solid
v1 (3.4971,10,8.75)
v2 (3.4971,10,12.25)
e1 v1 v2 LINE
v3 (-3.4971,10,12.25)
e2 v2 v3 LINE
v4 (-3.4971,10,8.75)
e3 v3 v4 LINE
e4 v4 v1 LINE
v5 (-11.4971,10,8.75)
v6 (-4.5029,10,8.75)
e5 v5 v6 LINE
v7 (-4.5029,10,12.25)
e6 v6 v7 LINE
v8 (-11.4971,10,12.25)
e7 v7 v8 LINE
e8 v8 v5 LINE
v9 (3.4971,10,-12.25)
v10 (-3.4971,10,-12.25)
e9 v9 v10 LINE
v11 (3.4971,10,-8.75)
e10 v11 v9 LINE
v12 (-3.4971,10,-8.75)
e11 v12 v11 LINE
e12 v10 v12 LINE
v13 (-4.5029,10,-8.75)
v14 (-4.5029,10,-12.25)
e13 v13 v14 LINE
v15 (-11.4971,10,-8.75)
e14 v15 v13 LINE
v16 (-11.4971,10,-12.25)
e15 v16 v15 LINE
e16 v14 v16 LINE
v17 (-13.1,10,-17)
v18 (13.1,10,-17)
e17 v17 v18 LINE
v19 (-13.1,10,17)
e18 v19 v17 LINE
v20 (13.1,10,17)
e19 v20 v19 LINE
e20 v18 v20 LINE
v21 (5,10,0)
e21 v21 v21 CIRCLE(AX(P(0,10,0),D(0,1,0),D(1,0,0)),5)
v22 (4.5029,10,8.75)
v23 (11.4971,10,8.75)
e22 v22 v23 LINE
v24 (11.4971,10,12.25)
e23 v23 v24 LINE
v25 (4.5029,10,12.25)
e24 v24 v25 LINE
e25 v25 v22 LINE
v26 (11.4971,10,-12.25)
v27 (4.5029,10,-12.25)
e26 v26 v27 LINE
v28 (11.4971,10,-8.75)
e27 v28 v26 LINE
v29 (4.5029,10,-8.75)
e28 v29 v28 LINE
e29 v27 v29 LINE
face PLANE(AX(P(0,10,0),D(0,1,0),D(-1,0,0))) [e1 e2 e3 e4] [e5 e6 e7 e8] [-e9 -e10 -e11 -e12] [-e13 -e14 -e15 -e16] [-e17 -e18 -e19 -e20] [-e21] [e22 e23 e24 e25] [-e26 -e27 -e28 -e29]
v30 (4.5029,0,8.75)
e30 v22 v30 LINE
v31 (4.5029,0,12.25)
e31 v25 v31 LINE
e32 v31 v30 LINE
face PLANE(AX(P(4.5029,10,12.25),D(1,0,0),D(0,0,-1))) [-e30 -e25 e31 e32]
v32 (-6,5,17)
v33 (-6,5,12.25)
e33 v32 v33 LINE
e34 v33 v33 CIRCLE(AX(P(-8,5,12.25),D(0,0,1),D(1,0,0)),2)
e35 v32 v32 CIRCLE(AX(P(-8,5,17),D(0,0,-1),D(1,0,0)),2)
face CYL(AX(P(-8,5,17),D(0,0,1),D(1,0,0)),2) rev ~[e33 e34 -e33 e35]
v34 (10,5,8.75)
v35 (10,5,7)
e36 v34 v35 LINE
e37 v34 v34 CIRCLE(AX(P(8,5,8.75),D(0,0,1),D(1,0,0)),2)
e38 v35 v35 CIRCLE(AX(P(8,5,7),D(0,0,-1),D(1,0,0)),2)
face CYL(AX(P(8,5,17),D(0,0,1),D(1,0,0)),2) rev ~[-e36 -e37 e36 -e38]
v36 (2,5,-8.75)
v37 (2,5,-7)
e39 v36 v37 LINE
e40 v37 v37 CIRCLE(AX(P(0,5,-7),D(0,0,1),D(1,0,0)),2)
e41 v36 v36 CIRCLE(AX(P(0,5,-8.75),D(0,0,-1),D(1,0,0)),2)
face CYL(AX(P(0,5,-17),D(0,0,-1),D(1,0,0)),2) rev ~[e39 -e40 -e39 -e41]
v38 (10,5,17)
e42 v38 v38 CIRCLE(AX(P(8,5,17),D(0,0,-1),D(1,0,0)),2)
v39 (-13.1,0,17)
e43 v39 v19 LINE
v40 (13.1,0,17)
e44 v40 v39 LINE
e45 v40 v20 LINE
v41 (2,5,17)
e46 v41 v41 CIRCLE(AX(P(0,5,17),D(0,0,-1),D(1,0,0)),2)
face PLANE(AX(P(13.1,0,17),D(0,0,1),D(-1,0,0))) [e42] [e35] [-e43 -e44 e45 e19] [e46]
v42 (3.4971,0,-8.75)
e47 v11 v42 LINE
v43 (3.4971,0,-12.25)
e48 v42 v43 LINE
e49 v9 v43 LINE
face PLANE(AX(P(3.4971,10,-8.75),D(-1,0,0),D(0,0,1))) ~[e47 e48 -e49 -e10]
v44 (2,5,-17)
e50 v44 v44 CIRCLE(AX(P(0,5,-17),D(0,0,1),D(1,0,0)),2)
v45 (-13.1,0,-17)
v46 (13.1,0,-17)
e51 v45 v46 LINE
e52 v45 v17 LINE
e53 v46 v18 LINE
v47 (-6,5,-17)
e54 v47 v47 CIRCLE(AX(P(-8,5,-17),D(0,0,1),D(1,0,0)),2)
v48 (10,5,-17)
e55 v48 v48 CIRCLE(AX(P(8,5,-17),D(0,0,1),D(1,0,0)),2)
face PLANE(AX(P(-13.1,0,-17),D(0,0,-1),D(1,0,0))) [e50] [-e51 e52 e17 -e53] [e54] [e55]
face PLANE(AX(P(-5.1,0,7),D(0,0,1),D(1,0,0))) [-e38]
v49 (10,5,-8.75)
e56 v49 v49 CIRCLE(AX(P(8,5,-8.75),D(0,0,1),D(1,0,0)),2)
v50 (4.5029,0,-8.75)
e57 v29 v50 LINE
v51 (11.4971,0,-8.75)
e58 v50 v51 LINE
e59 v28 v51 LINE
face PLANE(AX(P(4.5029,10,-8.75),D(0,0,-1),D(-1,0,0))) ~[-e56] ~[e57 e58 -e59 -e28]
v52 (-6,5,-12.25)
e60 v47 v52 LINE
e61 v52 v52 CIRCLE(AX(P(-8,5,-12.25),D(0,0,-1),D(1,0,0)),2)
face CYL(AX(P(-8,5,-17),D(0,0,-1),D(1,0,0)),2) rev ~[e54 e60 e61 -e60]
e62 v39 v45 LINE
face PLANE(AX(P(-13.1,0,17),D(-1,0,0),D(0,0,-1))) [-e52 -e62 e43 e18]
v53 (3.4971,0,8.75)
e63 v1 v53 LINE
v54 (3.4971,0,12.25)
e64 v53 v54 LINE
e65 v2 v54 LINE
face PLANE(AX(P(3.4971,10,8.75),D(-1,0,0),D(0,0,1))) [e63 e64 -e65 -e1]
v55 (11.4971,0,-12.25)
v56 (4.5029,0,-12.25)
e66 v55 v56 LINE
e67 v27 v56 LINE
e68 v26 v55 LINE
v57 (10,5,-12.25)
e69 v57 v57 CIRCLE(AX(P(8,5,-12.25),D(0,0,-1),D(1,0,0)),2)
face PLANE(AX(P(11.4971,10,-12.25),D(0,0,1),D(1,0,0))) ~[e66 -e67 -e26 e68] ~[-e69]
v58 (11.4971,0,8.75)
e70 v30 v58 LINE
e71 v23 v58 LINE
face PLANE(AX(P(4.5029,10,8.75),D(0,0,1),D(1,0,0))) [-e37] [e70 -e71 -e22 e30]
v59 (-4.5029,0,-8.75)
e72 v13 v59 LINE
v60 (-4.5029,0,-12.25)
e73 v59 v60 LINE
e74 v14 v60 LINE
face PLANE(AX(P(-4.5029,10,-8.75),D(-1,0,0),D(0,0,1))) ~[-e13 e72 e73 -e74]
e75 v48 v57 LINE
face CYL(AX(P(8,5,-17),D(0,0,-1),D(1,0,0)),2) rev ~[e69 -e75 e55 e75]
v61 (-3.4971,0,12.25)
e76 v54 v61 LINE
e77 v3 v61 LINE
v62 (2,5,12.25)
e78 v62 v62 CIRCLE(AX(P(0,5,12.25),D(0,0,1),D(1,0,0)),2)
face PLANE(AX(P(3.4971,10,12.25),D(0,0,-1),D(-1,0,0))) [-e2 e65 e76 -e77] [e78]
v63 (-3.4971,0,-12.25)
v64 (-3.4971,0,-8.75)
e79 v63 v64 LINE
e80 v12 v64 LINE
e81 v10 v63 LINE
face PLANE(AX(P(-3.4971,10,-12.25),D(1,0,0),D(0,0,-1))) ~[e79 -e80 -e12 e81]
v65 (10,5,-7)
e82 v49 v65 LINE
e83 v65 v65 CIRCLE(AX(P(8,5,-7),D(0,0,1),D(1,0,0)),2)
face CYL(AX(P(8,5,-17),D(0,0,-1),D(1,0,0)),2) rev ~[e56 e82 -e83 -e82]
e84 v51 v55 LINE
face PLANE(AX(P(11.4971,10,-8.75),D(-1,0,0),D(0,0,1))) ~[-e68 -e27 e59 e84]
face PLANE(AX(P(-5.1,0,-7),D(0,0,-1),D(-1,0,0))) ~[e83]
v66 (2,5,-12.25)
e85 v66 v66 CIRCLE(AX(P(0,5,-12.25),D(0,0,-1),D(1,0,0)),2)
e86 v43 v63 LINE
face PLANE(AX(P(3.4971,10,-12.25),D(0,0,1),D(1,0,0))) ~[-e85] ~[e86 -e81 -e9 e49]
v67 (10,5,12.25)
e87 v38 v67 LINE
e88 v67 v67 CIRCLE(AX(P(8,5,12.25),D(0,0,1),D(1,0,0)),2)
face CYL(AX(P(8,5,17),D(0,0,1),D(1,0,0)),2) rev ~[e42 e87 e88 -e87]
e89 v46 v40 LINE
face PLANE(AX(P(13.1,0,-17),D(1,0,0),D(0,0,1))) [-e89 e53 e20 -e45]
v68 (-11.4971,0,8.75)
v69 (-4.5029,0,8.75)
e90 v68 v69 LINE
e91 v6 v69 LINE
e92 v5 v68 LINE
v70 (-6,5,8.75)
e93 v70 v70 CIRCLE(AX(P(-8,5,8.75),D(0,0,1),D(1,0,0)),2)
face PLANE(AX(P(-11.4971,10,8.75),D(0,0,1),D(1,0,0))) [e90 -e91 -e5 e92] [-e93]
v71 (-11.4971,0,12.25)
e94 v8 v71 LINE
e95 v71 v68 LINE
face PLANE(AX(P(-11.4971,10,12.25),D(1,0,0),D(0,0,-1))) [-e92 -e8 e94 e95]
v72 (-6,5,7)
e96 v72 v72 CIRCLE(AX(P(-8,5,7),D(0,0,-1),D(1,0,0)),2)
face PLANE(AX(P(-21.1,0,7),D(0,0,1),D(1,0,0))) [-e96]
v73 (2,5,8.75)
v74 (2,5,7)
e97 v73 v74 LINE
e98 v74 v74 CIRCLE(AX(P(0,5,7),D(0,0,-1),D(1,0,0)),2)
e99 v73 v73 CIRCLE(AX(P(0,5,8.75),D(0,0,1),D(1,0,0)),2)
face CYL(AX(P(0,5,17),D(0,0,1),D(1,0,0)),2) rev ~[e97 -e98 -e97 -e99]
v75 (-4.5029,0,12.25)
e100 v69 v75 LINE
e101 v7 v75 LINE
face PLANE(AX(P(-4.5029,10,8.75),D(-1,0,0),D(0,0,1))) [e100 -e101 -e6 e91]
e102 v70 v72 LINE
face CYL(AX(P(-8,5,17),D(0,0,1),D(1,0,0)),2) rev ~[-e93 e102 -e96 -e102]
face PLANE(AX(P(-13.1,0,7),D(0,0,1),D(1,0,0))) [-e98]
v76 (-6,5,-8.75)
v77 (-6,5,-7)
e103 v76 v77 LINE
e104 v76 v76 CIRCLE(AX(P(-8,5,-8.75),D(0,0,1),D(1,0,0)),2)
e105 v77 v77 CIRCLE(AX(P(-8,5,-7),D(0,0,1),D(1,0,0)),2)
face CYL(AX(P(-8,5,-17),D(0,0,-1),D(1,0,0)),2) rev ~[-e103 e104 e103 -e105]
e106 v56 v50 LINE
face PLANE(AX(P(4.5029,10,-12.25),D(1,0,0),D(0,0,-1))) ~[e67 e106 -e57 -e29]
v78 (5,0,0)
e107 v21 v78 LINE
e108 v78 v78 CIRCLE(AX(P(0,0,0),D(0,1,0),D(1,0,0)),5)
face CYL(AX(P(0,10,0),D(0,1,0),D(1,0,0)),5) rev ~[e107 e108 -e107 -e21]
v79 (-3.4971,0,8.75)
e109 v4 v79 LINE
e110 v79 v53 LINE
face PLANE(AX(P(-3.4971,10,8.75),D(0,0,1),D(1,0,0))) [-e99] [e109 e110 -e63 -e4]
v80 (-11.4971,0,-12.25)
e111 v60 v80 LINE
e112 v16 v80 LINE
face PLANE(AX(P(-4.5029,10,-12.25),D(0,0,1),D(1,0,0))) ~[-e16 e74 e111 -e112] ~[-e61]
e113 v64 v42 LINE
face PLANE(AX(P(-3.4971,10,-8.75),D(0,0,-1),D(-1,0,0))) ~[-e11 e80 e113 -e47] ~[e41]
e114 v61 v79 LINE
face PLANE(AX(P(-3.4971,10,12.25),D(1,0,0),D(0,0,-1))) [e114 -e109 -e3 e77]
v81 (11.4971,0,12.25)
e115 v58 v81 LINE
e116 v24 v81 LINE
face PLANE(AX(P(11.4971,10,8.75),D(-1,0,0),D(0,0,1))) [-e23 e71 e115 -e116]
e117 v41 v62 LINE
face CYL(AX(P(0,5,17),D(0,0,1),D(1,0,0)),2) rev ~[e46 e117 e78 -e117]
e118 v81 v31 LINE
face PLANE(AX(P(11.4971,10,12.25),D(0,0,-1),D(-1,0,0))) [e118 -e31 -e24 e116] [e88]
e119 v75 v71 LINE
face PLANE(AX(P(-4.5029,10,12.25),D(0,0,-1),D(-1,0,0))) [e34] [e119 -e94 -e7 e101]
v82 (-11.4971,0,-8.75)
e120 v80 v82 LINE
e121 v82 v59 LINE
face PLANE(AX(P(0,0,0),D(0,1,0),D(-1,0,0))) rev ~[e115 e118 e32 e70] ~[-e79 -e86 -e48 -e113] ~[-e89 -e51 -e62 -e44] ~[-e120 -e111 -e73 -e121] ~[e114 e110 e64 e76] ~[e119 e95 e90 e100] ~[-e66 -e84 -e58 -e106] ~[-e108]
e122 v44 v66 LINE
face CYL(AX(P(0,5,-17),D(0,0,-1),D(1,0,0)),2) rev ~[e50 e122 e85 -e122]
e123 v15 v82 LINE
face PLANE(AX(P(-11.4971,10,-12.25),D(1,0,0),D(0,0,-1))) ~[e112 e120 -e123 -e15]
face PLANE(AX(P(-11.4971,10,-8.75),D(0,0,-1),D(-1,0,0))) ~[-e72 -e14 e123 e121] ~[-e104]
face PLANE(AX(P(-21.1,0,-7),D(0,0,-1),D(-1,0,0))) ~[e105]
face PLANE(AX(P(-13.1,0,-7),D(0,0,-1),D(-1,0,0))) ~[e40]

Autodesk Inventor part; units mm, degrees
ref_plane "YZ Plane" through (0, 0, 0) normal (1, 0, 0) x (0, 1, 0)
ref_plane "XZ Plane" through (0, 0, 0) normal (0, 1, 0) x (-1, 0, 0)
ref_plane "XY Plane" through (0, 0, 0) normal (0, 0, 1) x (1, 0, 0)
sketch "Эскиз1" plane through (0, 0, 0) normal (0, 1, 0) x (-1, 0, 0)
  line L0 (-13.1, 17) -> (13.1, 17)
  line L1 (13.1, 17) -> (13.1, -17)
  line L2 (13.1, -17) -> (-13.1, -17)
  line L3 (-13.1, -17) -> (-13.1, 17)
  line L4 (-13.1, 17) -> (13.1, -17) construction
  line L5 (13.1, 17) -> (-13.1, -17) construction
  point P0 (0, 0)
  dimension "d0" = 26.2
  dimension "d1" = 34
extrude "Выдавливание1" add sketch "Эскиз1" along normal blind 10
sketch "Эскиз2" plane through (-13.1, 0, 17) normal (0, 0, 1) x (1, 0, 0)
  line L0 (0, 10) -> (26.2, 10) projected
  line L1 (13.1, 10) -> (13.1, 5)
  circle A0 centre (13.1, 5) radius 2
  point P0 (13.1, 0)
  dimension "d4" = 5
  dimension "d5" = 4
extrude "Выдавливание2" cut sketch "Эскиз2" against normal blind 10
sketch "Эскиз4" plane through (0, 10, 0) normal (0, 1, 0) x (1, 0, 0)
  line L0 (2, -7) -> (-2, -7) projected
  line L1 (3.4971, -12.25) -> (-3.4971, -12.25)
  line L2 (-3.4971, -12.25) -> (-3.4971, -8.75)
  line L3 (-3.4971, -8.75) -> (3.4971, -8.75)
  line L4 (3.4971, -8.75) -> (3.4971, -12.25)
  line L5 (3.4971, -12.25) -> (-3.4971, -8.75) construction
  line L6 (-3.4971, -12.25) -> (3.4971, -8.75) construction
  point P0 (0, 0)
  point P1 (0, -10.5)
  dimension "d20" = 10.5
extrude "Выдавливание3" cut sketch "Эскиз4" against normal through all
pattern_linear "Прямоуг.массив2" count 3 spacing 8 along (1, 0, 0) of "Выдавливание2", "Выдавливание3" first direction both ways yes
mirror "Зеркальное отражение2" about plane through (0, 0, 0) normal (0, 0, 1) of "Выдавливание2", "Выдавливание3", "Прямоуг.массив2"
sketch "Эскиз5" plane through (0, 10, 0) normal (0, 1, 0) x (1, 0, 0)
  circle A0 centre (0, 0) radius 5
  dimension "d17" = 10
extrude "Выдавливание4" cut sketch "Эскиз5" against normal blind 10
sketch "Эскиз6" plane through (0, 10, 0) normal (0, 1, 0) x (1, 0, 0)
  circle A0 centre (0, 0) radius 5 projected
  line L0 (4.5029, 8.75) -> (4.5029, 12.25) projected
  line L1 (4.5029, 12.25) -> (11.4971, 12.25) projected
  line L2 (11.4971, 12.25) -> (11.4971, 8.75) projected
  line L3 (-11.4971, 8.75) -> (-11.4971, 12.25) projected
  line L4 (-11.4971, 12.25) -> (-4.5029, 12.25) projected
  line L5 (-4.5029, 12.25) -> (-4.5029, 8.75) projected
  line L6 (-3.4971, 8.75) -> (-3.4971, 12.25) projected
  line L7 (-3.4971, 12.25) -> (3.4971, 12.25) projected
  line L8 (3.4971, 12.25) -> (3.4971, 8.75) projected
  line L9 (4.5029, -12.25) -> (4.5029, -8.75) projected
  line L10 (11.4971, -8.75) -> (11.4971, -12.25) projected
  line L11 (11.4971, -12.25) -> (4.5029, -12.25) projected
  line L12 (-11.4971, -12.25) -> (-11.4971, -8.75) projected
  line L13 (-4.5029, -8.75) -> (-4.5029, -12.25) projected
  line L14 (-4.5029, -12.25) -> (-11.4971, -12.25) projected
  line L15 (3.4971, -8.75) -> (3.4971, -12.25) projected
  line L16 (3.4971, -12.25) -> (-3.4971, -12.25) projected
  line L17 (-3.4971, -12.25) -> (-3.4971, -8.75) projected
  line L18 (-13.1, -17) -> (13.1, -17) projected
  line L19 (13.1, -17) -> (13.1, 17) projected
  line L20 (13.1, 17) -> (-13.1, 17) projected
  line L21 (-13.1, 17) -> (-13.1, -17) projected
  line L22 (11.4971, 8.75) -> (4.5029, 8.75) projected
  line L23 (-4.5029, 8.75) -> (-11.4971, 8.75) projected
  line L24 (3.4971, 8.75) -> (-3.4971, 8.75) projected
  line L25 (4.5029, -8.75) -> (11.4971, -8.75) projected
  line L26 (-11.4971, -8.75) -> (-4.5029, -8.75) projected
  line L27 (-3.4971, -8.75) -> (3.4971, -8.75) projected
properties part number "000.406 - Проставка" material "Пластик АБС"
